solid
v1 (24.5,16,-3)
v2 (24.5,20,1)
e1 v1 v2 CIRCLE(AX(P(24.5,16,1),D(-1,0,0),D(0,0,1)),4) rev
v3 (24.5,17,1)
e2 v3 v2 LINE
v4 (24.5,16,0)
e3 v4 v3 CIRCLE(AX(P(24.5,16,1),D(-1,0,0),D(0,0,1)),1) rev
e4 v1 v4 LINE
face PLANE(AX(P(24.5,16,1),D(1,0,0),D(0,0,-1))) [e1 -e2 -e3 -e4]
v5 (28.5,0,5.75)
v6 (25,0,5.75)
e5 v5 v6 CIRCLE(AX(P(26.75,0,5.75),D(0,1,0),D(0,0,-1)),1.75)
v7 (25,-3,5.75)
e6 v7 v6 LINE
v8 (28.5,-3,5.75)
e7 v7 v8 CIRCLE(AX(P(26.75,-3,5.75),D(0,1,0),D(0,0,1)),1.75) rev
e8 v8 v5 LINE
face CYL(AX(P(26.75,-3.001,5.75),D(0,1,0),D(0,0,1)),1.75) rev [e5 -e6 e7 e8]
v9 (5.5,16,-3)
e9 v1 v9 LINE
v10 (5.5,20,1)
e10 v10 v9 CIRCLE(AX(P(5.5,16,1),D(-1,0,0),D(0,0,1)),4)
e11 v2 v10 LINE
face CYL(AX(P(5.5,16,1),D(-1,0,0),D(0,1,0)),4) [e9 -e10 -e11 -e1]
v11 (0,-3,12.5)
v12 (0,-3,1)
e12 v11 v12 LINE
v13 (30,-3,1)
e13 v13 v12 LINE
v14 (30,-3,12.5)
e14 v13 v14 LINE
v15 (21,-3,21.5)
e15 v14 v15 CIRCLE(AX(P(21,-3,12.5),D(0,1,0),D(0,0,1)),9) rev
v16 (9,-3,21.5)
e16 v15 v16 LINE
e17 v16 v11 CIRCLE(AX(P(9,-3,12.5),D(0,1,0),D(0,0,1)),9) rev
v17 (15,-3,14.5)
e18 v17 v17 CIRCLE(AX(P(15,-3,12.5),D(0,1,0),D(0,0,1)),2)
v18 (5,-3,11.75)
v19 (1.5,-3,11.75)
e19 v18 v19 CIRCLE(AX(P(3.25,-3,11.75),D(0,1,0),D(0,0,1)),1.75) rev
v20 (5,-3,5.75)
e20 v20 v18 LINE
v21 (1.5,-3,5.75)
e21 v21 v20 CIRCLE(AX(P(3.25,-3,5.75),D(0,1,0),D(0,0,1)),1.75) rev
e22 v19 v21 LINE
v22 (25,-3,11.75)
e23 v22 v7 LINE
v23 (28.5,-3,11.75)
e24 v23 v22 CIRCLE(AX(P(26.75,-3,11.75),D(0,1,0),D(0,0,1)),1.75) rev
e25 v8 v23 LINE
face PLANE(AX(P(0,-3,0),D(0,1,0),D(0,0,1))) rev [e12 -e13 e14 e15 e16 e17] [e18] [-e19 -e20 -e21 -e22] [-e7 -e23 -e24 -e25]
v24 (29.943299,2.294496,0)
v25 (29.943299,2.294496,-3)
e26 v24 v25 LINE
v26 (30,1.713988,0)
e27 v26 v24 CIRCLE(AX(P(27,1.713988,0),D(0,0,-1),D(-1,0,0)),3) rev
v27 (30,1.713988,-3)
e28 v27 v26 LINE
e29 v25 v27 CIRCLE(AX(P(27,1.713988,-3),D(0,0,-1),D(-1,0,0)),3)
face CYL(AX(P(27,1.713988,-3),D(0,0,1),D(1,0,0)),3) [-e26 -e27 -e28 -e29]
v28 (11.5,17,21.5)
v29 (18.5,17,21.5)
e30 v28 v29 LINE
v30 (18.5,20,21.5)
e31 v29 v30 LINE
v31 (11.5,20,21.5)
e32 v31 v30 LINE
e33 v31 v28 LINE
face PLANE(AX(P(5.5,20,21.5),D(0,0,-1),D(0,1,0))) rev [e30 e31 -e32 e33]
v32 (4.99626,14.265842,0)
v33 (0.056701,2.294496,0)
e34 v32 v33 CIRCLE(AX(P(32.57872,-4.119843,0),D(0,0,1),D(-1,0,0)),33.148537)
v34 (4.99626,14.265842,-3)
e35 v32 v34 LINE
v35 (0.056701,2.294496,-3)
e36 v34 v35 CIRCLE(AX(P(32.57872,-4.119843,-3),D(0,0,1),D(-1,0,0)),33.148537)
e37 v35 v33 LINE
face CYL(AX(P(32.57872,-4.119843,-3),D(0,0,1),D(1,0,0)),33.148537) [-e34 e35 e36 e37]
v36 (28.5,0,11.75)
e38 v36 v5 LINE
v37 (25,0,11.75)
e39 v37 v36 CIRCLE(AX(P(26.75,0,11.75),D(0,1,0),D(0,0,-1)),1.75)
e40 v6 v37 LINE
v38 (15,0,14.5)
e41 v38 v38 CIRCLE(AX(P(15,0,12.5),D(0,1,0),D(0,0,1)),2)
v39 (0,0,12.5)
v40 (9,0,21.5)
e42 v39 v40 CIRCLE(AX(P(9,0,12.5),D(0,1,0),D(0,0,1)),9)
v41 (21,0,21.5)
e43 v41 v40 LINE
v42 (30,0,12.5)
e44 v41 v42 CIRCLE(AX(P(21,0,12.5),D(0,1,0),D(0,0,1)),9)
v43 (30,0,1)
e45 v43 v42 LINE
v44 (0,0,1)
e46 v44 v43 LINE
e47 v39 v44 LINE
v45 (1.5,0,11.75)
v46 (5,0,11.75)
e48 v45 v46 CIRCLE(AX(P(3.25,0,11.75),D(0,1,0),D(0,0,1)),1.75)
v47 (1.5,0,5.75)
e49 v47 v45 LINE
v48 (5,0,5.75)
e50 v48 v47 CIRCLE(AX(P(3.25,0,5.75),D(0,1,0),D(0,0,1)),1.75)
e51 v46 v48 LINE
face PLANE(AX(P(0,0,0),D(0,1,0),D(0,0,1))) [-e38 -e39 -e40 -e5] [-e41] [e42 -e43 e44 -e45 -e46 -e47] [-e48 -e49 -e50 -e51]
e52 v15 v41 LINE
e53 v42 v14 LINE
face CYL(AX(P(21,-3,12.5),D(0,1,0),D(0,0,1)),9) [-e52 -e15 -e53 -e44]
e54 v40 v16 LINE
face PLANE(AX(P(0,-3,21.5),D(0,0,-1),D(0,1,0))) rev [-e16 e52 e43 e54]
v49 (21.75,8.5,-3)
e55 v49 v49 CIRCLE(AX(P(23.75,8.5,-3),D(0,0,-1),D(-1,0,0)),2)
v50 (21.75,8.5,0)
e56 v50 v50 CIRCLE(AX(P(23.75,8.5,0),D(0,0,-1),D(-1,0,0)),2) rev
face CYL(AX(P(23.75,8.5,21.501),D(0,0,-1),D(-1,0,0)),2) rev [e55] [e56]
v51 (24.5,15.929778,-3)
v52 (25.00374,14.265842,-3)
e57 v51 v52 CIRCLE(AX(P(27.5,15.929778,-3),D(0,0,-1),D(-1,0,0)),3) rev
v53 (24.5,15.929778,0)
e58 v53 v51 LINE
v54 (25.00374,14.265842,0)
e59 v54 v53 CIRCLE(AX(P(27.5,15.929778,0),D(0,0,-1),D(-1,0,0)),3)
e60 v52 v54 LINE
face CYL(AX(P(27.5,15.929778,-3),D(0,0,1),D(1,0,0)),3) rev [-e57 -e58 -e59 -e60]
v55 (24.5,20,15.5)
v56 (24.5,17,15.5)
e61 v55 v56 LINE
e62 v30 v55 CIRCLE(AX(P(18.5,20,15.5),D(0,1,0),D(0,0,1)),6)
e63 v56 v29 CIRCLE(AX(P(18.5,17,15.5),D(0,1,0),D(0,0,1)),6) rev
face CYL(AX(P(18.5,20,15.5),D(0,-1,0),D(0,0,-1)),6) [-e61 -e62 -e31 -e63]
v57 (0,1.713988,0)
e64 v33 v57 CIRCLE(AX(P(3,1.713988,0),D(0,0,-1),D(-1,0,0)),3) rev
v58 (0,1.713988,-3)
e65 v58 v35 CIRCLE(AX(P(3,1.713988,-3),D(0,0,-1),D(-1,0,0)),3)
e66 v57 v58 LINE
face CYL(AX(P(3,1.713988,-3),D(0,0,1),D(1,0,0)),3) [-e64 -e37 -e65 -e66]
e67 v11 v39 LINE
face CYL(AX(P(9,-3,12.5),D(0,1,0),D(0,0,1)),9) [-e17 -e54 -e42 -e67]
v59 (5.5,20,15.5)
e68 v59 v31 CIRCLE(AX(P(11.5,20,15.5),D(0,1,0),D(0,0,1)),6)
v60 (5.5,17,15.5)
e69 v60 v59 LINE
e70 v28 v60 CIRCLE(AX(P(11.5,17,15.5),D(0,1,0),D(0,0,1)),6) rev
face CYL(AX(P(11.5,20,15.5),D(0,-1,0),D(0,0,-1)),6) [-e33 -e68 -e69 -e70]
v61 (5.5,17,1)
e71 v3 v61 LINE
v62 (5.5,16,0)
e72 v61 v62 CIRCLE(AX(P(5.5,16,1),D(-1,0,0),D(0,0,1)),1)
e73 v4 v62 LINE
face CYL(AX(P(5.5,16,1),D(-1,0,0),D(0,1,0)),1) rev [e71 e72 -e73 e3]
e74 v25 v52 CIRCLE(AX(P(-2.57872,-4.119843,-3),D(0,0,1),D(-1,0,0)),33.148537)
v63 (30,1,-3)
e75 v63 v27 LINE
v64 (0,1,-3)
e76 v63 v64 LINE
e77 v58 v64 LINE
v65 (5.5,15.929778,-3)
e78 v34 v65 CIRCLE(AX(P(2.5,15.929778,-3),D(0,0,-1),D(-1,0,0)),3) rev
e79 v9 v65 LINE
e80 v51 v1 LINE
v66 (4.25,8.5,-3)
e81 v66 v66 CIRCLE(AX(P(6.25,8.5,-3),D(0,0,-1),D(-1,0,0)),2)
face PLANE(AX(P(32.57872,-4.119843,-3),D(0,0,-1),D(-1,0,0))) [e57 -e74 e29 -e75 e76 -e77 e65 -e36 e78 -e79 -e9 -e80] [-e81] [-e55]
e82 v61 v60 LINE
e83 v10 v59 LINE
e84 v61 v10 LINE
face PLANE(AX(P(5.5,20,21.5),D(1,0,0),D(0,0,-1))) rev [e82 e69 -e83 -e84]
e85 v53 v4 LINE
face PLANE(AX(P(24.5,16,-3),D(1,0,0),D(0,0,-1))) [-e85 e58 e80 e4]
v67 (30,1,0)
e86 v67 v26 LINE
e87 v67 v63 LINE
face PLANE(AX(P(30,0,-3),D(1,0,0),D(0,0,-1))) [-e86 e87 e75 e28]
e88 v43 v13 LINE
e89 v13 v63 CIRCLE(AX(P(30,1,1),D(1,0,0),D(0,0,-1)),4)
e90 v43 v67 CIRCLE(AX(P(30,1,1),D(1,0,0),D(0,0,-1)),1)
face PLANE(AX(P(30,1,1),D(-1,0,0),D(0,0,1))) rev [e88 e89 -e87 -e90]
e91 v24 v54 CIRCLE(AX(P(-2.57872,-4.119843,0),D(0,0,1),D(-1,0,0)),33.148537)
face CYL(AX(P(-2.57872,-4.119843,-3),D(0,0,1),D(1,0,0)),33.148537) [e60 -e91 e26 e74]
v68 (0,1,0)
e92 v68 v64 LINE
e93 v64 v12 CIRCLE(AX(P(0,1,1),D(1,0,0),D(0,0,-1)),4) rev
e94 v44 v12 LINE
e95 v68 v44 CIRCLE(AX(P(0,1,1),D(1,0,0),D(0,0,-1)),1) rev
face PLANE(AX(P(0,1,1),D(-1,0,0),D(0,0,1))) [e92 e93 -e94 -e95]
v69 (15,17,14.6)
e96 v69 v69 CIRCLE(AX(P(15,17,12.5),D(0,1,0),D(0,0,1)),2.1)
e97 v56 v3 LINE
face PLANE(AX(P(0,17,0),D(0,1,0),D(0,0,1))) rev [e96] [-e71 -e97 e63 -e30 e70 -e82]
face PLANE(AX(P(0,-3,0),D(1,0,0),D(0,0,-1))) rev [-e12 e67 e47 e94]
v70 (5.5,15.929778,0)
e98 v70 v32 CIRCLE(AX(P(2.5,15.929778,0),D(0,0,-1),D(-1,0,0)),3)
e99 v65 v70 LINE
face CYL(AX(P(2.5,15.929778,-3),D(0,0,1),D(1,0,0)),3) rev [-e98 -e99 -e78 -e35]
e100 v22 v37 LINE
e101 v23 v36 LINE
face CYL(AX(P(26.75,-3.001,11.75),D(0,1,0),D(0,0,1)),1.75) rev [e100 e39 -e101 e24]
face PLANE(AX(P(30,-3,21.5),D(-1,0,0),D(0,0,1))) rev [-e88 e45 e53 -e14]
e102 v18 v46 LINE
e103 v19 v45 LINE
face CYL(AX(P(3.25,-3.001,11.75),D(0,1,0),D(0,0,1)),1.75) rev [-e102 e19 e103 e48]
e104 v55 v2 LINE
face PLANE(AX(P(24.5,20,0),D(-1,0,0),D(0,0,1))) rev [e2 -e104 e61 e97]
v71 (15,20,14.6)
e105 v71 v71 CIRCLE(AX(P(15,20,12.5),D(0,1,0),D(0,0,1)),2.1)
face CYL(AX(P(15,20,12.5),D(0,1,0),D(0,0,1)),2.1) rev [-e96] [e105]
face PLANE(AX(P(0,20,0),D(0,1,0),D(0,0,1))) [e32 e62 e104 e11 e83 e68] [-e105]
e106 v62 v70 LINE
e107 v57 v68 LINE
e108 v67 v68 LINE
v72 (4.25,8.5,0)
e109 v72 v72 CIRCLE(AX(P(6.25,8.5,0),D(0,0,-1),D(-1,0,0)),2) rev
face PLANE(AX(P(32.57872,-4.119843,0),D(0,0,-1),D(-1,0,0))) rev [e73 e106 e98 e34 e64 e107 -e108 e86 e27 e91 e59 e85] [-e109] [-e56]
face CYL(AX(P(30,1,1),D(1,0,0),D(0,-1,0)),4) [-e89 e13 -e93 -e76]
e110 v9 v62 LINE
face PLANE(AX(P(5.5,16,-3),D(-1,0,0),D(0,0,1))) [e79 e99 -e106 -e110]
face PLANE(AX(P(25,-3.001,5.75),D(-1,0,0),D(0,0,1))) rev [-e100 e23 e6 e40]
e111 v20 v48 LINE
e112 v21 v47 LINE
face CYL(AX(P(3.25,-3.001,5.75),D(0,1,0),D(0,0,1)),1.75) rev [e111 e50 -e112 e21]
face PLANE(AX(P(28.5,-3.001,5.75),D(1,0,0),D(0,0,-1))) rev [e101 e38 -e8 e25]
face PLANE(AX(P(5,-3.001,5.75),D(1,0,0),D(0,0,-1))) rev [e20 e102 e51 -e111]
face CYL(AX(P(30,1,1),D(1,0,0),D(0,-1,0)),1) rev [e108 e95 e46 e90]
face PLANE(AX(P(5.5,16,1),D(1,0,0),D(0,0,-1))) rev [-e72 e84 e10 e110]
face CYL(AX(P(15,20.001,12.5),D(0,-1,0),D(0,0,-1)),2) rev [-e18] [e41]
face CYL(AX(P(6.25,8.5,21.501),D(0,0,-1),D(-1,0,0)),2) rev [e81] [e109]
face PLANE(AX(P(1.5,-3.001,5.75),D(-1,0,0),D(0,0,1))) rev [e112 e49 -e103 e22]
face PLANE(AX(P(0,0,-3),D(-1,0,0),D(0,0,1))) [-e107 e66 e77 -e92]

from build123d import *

# Parameters (mm, degrees)
BRIDA_BASE1_DEPTH                = 3
BRIDA_DE_ARISTA1_STRIP_W         = 14
BRIDA_DE_ARISTA1_STRIP_H         = 3
BRIDA_DE_ARISTA1_STRIP_CUT_DEPTH = 30
BRIDA_DE_ARISTA1_DEPTH           = 30
BRIDA_DE_ARISTA2_DEPTH           = 19
CORTAR_EXTRUIR1_REACH            = 45.489
CROQUIS12_R                      = 2
CORTAR_EXTRUIR2_REACH            = 43.979
CORTAR_EXTRUIR6_REACH            = 45.592
CROQUIS26_R                      = 2
TALADRO_ROSCADO_M51_D            = 4.2
TALADRO_ROSCADO_M51_DEPTH        = 3
REDONDEO2_R                      = 9
REDONDEO3_R                      = 6
REDONDEO4_R                      = 3


# Sheet-metal steps are written as plain solids
with BuildPart() as part:
    # Croquis1 → Brida base1 (new body)
    with BuildSketch(Plane.XY):
        with BuildLine():
            Line((0, 0), (30, 0))
            Line((30, 0), (30, 2))
            ThreePointArc((30, 2), (27.949996593, 8.796152405), (24.5, 15))
            Line((24.5, 15), (24.5, 16))
            Line((24.5, 16), (5.5, 16))
            Line((5.5, 16), (5.5, 15))
            ThreePointArc((5.5, 15), (2.050003407, 8.796152405), (0, 2))
            Line((0, 2), (0, 0))
        make_face()
    extrude(amount=-BRIDA_BASE1_DEPTH)

    # Brida de arista1 strip (across the edge) → Brida de arista1 strip cut (cut)
    with BuildSketch(Plane.YZ):
        with Locations((-6, -1.5)):
            Rectangle(BRIDA_DE_ARISTA1_STRIP_W, BRIDA_DE_ARISTA1_STRIP_H)
    extrude(amount=BRIDA_DE_ARISTA1_STRIP_CUT_DEPTH, mode=Mode.SUBTRACT)

    # Brida de arista1 section (across the edge) → Brida de arista1 (add)
    with BuildSketch(Plane.YZ):
        with BuildLine():
            Line((-3, 1), (-3, 21.5))
            Line((-3, 21.5), (0, 21.5))
            Line((0, 21.5), (0, 1))
            ThreePointArc((0, 1), (0.292893219, 0.292893219), (1, 0))
            Line((1, 0), (1, -3))
            ThreePointArc((1, -3), (-1.828427125, -1.828427125), (-3, 1))
        make_face()
    extrude(amount=BRIDA_DE_ARISTA1_DEPTH)

    # Brida de arista2 section (across the edge) → Brida de arista2 (add)
    with BuildSketch(Plane(origin=(24.5, 17, 0), x_dir=(0, -1, 0), z_dir=(-1, 0, 0))):
        with BuildLine():
            Line((-3, 1), (-3, 21.5))
            Line((-3, 21.5), (0, 21.5))
            Line((0, 21.5), (0, 1))
            ThreePointArc((0, 1), (0.292893219, 0.292893219), (1, 0))
            Line((1, 0), (1, -3))
            ThreePointArc((1, -3), (-1.828427125, -1.828427125), (-3, 1))
        make_face()
    extrude(amount=BRIDA_DE_ARISTA2_DEPTH)

    # Croquis12 → Cortar-Extruir1 (cut, up to next)
    with BuildSketch(Plane(origin=(0, -3, 0), x_dir=(1, 0, 0), z_dir=(0, 1, 0)), mode=Mode.PRIVATE) as cortar_extruir1_sk1:
        with Locations(Location((15, -12.5, 0), (0, 0, 270))):
            Circle(CROQUIS12_R)
    cortar_extruir1_tool1 = extrude(cortar_extruir1_sk1.sketch, amount=CORTAR_EXTRUIR1_REACH, mode=Mode.PRIVATE) & part.part
    add(cortar_extruir1_tool1.solids().sort_by_distance((15, -3, 12.5))[0], mode=Mode.SUBTRACT)

    # Croquis13 → Cortar-Extruir2 (cut, up to next)
    with BuildSketch(Plane(origin=(0, 0, 0), x_dir=(1, 0, 0), z_dir=(0, 1, 0)), mode=Mode.PRIVATE) as cortar_extruir2_sk1:
        with BuildLine():
            Line((5, -5.75), (5, -11.75))
            ThreePointArc((5, -11.75), (3.25, -13.5), (1.5, -11.75))
            Line((1.5, -11.75), (1.5, -5.75))
            ThreePointArc((1.5, -5.75), (3.25, -4), (5, -5.75))
        make_face()
    cortar_extruir2_tool1 = extrude(cortar_extruir2_sk1.sketch, amount=-CORTAR_EXTRUIR2_REACH, mode=Mode.PRIVATE) & part.part
    # Croquis13 → Cortar-Extruir2 (cut, up to next)
    with BuildSketch(Plane(origin=(0, 0, 0), x_dir=(1, 0, 0), z_dir=(0, 1, 0)), mode=Mode.PRIVATE) as cortar_extruir2_sk2:
        with BuildLine():
            Line((25, -5.75), (25, -11.75))
            ThreePointArc((25, -11.75), (26.75, -13.5), (28.5, -11.75))
            Line((28.5, -11.75), (28.5, -5.75))
            ThreePointArc((28.5, -5.75), (26.75, -4), (25, -5.75))
        make_face()
    cortar_extruir2_tool2 = extrude(cortar_extruir2_sk2.sketch, amount=-CORTAR_EXTRUIR2_REACH, mode=Mode.PRIVATE) & part.part
    add(cortar_extruir2_tool1.solids().sort_by_distance((3.25, 0, 8.75))[0], mode=Mode.SUBTRACT)
    add(cortar_extruir2_tool2.solids().sort_by_distance((26.75, 0, 8.75))[0], mode=Mode.SUBTRACT)

    # Croquis26 → Cortar-Extruir6 (cut, up to next)
    with BuildSketch(Plane(origin=(0, 0, -3), x_dir=(-1, 0, 0), z_dir=(0, 0, -1)), mode=Mode.PRIVATE) as cortar_extruir6_sk1:
        with Locations((-6.25, 8.5)):
            Circle(CROQUIS26_R)
    cortar_extruir6_tool1 = extrude(cortar_extruir6_sk1.sketch, amount=-CORTAR_EXTRUIR6_REACH, mode=Mode.PRIVATE) & part.part
    # Croquis26 → Cortar-Extruir6 (cut, up to next)
    with BuildSketch(Plane(origin=(0, 0, -3), x_dir=(-1, 0, 0), z_dir=(0, 0, -1)), mode=Mode.PRIVATE) as cortar_extruir6_sk2:
        with Locations((-23.75, 8.5)):
            Circle(CROQUIS26_R)
    cortar_extruir6_tool2 = extrude(cortar_extruir6_sk2.sketch, amount=-CORTAR_EXTRUIR6_REACH, mode=Mode.PRIVATE) & part.part
    add(cortar_extruir6_tool1.solids().sort_by_distance((6.25, 8.5, -3))[0], mode=Mode.SUBTRACT)
    add(cortar_extruir6_tool2.solids().sort_by_distance((23.75, 8.5, -3))[0], mode=Mode.SUBTRACT)

    # Taladro roscado M51
    with Locations(Plane(origin=(15, 20, 12.5), x_dir=(0, 0, 1), z_dir=(0, 1, 0))):
        with Locations((0, 0)):
            Hole(TALADRO_ROSCADO_M51_D / 2, depth=TALADRO_ROSCADO_M51_DEPTH)

    # Redondeo2
    redondeo2_edges = [part.edges().sort_by_distance(p)[0] for p in [
        (0, -1.5, 21.5),
        (30, -1.5, 21.5),
    ]]
    fillet(redondeo2_edges, radius=REDONDEO2_R)

    # Redondeo3
    redondeo3_edges = [part.edges().sort_by_distance(p)[0] for p in [
        (24.5, 18.5, 21.5),
        (5.5, 18.5, 21.5),
    ]]
    fillet(redondeo3_edges, radius=REDONDEO3_R)

    # Redondeo4
    redondeo4_edges = [part.edges().sort_by_distance(p)[0] for p in [
        (0, 2, -1.5),
        (5.5, 15, -1.5),
        (24.5, 15, -1.5),
        (30, 2, -1.5),
    ]]
    fillet(redondeo4_edges, radius=REDONDEO4_R)


solid = part.part
